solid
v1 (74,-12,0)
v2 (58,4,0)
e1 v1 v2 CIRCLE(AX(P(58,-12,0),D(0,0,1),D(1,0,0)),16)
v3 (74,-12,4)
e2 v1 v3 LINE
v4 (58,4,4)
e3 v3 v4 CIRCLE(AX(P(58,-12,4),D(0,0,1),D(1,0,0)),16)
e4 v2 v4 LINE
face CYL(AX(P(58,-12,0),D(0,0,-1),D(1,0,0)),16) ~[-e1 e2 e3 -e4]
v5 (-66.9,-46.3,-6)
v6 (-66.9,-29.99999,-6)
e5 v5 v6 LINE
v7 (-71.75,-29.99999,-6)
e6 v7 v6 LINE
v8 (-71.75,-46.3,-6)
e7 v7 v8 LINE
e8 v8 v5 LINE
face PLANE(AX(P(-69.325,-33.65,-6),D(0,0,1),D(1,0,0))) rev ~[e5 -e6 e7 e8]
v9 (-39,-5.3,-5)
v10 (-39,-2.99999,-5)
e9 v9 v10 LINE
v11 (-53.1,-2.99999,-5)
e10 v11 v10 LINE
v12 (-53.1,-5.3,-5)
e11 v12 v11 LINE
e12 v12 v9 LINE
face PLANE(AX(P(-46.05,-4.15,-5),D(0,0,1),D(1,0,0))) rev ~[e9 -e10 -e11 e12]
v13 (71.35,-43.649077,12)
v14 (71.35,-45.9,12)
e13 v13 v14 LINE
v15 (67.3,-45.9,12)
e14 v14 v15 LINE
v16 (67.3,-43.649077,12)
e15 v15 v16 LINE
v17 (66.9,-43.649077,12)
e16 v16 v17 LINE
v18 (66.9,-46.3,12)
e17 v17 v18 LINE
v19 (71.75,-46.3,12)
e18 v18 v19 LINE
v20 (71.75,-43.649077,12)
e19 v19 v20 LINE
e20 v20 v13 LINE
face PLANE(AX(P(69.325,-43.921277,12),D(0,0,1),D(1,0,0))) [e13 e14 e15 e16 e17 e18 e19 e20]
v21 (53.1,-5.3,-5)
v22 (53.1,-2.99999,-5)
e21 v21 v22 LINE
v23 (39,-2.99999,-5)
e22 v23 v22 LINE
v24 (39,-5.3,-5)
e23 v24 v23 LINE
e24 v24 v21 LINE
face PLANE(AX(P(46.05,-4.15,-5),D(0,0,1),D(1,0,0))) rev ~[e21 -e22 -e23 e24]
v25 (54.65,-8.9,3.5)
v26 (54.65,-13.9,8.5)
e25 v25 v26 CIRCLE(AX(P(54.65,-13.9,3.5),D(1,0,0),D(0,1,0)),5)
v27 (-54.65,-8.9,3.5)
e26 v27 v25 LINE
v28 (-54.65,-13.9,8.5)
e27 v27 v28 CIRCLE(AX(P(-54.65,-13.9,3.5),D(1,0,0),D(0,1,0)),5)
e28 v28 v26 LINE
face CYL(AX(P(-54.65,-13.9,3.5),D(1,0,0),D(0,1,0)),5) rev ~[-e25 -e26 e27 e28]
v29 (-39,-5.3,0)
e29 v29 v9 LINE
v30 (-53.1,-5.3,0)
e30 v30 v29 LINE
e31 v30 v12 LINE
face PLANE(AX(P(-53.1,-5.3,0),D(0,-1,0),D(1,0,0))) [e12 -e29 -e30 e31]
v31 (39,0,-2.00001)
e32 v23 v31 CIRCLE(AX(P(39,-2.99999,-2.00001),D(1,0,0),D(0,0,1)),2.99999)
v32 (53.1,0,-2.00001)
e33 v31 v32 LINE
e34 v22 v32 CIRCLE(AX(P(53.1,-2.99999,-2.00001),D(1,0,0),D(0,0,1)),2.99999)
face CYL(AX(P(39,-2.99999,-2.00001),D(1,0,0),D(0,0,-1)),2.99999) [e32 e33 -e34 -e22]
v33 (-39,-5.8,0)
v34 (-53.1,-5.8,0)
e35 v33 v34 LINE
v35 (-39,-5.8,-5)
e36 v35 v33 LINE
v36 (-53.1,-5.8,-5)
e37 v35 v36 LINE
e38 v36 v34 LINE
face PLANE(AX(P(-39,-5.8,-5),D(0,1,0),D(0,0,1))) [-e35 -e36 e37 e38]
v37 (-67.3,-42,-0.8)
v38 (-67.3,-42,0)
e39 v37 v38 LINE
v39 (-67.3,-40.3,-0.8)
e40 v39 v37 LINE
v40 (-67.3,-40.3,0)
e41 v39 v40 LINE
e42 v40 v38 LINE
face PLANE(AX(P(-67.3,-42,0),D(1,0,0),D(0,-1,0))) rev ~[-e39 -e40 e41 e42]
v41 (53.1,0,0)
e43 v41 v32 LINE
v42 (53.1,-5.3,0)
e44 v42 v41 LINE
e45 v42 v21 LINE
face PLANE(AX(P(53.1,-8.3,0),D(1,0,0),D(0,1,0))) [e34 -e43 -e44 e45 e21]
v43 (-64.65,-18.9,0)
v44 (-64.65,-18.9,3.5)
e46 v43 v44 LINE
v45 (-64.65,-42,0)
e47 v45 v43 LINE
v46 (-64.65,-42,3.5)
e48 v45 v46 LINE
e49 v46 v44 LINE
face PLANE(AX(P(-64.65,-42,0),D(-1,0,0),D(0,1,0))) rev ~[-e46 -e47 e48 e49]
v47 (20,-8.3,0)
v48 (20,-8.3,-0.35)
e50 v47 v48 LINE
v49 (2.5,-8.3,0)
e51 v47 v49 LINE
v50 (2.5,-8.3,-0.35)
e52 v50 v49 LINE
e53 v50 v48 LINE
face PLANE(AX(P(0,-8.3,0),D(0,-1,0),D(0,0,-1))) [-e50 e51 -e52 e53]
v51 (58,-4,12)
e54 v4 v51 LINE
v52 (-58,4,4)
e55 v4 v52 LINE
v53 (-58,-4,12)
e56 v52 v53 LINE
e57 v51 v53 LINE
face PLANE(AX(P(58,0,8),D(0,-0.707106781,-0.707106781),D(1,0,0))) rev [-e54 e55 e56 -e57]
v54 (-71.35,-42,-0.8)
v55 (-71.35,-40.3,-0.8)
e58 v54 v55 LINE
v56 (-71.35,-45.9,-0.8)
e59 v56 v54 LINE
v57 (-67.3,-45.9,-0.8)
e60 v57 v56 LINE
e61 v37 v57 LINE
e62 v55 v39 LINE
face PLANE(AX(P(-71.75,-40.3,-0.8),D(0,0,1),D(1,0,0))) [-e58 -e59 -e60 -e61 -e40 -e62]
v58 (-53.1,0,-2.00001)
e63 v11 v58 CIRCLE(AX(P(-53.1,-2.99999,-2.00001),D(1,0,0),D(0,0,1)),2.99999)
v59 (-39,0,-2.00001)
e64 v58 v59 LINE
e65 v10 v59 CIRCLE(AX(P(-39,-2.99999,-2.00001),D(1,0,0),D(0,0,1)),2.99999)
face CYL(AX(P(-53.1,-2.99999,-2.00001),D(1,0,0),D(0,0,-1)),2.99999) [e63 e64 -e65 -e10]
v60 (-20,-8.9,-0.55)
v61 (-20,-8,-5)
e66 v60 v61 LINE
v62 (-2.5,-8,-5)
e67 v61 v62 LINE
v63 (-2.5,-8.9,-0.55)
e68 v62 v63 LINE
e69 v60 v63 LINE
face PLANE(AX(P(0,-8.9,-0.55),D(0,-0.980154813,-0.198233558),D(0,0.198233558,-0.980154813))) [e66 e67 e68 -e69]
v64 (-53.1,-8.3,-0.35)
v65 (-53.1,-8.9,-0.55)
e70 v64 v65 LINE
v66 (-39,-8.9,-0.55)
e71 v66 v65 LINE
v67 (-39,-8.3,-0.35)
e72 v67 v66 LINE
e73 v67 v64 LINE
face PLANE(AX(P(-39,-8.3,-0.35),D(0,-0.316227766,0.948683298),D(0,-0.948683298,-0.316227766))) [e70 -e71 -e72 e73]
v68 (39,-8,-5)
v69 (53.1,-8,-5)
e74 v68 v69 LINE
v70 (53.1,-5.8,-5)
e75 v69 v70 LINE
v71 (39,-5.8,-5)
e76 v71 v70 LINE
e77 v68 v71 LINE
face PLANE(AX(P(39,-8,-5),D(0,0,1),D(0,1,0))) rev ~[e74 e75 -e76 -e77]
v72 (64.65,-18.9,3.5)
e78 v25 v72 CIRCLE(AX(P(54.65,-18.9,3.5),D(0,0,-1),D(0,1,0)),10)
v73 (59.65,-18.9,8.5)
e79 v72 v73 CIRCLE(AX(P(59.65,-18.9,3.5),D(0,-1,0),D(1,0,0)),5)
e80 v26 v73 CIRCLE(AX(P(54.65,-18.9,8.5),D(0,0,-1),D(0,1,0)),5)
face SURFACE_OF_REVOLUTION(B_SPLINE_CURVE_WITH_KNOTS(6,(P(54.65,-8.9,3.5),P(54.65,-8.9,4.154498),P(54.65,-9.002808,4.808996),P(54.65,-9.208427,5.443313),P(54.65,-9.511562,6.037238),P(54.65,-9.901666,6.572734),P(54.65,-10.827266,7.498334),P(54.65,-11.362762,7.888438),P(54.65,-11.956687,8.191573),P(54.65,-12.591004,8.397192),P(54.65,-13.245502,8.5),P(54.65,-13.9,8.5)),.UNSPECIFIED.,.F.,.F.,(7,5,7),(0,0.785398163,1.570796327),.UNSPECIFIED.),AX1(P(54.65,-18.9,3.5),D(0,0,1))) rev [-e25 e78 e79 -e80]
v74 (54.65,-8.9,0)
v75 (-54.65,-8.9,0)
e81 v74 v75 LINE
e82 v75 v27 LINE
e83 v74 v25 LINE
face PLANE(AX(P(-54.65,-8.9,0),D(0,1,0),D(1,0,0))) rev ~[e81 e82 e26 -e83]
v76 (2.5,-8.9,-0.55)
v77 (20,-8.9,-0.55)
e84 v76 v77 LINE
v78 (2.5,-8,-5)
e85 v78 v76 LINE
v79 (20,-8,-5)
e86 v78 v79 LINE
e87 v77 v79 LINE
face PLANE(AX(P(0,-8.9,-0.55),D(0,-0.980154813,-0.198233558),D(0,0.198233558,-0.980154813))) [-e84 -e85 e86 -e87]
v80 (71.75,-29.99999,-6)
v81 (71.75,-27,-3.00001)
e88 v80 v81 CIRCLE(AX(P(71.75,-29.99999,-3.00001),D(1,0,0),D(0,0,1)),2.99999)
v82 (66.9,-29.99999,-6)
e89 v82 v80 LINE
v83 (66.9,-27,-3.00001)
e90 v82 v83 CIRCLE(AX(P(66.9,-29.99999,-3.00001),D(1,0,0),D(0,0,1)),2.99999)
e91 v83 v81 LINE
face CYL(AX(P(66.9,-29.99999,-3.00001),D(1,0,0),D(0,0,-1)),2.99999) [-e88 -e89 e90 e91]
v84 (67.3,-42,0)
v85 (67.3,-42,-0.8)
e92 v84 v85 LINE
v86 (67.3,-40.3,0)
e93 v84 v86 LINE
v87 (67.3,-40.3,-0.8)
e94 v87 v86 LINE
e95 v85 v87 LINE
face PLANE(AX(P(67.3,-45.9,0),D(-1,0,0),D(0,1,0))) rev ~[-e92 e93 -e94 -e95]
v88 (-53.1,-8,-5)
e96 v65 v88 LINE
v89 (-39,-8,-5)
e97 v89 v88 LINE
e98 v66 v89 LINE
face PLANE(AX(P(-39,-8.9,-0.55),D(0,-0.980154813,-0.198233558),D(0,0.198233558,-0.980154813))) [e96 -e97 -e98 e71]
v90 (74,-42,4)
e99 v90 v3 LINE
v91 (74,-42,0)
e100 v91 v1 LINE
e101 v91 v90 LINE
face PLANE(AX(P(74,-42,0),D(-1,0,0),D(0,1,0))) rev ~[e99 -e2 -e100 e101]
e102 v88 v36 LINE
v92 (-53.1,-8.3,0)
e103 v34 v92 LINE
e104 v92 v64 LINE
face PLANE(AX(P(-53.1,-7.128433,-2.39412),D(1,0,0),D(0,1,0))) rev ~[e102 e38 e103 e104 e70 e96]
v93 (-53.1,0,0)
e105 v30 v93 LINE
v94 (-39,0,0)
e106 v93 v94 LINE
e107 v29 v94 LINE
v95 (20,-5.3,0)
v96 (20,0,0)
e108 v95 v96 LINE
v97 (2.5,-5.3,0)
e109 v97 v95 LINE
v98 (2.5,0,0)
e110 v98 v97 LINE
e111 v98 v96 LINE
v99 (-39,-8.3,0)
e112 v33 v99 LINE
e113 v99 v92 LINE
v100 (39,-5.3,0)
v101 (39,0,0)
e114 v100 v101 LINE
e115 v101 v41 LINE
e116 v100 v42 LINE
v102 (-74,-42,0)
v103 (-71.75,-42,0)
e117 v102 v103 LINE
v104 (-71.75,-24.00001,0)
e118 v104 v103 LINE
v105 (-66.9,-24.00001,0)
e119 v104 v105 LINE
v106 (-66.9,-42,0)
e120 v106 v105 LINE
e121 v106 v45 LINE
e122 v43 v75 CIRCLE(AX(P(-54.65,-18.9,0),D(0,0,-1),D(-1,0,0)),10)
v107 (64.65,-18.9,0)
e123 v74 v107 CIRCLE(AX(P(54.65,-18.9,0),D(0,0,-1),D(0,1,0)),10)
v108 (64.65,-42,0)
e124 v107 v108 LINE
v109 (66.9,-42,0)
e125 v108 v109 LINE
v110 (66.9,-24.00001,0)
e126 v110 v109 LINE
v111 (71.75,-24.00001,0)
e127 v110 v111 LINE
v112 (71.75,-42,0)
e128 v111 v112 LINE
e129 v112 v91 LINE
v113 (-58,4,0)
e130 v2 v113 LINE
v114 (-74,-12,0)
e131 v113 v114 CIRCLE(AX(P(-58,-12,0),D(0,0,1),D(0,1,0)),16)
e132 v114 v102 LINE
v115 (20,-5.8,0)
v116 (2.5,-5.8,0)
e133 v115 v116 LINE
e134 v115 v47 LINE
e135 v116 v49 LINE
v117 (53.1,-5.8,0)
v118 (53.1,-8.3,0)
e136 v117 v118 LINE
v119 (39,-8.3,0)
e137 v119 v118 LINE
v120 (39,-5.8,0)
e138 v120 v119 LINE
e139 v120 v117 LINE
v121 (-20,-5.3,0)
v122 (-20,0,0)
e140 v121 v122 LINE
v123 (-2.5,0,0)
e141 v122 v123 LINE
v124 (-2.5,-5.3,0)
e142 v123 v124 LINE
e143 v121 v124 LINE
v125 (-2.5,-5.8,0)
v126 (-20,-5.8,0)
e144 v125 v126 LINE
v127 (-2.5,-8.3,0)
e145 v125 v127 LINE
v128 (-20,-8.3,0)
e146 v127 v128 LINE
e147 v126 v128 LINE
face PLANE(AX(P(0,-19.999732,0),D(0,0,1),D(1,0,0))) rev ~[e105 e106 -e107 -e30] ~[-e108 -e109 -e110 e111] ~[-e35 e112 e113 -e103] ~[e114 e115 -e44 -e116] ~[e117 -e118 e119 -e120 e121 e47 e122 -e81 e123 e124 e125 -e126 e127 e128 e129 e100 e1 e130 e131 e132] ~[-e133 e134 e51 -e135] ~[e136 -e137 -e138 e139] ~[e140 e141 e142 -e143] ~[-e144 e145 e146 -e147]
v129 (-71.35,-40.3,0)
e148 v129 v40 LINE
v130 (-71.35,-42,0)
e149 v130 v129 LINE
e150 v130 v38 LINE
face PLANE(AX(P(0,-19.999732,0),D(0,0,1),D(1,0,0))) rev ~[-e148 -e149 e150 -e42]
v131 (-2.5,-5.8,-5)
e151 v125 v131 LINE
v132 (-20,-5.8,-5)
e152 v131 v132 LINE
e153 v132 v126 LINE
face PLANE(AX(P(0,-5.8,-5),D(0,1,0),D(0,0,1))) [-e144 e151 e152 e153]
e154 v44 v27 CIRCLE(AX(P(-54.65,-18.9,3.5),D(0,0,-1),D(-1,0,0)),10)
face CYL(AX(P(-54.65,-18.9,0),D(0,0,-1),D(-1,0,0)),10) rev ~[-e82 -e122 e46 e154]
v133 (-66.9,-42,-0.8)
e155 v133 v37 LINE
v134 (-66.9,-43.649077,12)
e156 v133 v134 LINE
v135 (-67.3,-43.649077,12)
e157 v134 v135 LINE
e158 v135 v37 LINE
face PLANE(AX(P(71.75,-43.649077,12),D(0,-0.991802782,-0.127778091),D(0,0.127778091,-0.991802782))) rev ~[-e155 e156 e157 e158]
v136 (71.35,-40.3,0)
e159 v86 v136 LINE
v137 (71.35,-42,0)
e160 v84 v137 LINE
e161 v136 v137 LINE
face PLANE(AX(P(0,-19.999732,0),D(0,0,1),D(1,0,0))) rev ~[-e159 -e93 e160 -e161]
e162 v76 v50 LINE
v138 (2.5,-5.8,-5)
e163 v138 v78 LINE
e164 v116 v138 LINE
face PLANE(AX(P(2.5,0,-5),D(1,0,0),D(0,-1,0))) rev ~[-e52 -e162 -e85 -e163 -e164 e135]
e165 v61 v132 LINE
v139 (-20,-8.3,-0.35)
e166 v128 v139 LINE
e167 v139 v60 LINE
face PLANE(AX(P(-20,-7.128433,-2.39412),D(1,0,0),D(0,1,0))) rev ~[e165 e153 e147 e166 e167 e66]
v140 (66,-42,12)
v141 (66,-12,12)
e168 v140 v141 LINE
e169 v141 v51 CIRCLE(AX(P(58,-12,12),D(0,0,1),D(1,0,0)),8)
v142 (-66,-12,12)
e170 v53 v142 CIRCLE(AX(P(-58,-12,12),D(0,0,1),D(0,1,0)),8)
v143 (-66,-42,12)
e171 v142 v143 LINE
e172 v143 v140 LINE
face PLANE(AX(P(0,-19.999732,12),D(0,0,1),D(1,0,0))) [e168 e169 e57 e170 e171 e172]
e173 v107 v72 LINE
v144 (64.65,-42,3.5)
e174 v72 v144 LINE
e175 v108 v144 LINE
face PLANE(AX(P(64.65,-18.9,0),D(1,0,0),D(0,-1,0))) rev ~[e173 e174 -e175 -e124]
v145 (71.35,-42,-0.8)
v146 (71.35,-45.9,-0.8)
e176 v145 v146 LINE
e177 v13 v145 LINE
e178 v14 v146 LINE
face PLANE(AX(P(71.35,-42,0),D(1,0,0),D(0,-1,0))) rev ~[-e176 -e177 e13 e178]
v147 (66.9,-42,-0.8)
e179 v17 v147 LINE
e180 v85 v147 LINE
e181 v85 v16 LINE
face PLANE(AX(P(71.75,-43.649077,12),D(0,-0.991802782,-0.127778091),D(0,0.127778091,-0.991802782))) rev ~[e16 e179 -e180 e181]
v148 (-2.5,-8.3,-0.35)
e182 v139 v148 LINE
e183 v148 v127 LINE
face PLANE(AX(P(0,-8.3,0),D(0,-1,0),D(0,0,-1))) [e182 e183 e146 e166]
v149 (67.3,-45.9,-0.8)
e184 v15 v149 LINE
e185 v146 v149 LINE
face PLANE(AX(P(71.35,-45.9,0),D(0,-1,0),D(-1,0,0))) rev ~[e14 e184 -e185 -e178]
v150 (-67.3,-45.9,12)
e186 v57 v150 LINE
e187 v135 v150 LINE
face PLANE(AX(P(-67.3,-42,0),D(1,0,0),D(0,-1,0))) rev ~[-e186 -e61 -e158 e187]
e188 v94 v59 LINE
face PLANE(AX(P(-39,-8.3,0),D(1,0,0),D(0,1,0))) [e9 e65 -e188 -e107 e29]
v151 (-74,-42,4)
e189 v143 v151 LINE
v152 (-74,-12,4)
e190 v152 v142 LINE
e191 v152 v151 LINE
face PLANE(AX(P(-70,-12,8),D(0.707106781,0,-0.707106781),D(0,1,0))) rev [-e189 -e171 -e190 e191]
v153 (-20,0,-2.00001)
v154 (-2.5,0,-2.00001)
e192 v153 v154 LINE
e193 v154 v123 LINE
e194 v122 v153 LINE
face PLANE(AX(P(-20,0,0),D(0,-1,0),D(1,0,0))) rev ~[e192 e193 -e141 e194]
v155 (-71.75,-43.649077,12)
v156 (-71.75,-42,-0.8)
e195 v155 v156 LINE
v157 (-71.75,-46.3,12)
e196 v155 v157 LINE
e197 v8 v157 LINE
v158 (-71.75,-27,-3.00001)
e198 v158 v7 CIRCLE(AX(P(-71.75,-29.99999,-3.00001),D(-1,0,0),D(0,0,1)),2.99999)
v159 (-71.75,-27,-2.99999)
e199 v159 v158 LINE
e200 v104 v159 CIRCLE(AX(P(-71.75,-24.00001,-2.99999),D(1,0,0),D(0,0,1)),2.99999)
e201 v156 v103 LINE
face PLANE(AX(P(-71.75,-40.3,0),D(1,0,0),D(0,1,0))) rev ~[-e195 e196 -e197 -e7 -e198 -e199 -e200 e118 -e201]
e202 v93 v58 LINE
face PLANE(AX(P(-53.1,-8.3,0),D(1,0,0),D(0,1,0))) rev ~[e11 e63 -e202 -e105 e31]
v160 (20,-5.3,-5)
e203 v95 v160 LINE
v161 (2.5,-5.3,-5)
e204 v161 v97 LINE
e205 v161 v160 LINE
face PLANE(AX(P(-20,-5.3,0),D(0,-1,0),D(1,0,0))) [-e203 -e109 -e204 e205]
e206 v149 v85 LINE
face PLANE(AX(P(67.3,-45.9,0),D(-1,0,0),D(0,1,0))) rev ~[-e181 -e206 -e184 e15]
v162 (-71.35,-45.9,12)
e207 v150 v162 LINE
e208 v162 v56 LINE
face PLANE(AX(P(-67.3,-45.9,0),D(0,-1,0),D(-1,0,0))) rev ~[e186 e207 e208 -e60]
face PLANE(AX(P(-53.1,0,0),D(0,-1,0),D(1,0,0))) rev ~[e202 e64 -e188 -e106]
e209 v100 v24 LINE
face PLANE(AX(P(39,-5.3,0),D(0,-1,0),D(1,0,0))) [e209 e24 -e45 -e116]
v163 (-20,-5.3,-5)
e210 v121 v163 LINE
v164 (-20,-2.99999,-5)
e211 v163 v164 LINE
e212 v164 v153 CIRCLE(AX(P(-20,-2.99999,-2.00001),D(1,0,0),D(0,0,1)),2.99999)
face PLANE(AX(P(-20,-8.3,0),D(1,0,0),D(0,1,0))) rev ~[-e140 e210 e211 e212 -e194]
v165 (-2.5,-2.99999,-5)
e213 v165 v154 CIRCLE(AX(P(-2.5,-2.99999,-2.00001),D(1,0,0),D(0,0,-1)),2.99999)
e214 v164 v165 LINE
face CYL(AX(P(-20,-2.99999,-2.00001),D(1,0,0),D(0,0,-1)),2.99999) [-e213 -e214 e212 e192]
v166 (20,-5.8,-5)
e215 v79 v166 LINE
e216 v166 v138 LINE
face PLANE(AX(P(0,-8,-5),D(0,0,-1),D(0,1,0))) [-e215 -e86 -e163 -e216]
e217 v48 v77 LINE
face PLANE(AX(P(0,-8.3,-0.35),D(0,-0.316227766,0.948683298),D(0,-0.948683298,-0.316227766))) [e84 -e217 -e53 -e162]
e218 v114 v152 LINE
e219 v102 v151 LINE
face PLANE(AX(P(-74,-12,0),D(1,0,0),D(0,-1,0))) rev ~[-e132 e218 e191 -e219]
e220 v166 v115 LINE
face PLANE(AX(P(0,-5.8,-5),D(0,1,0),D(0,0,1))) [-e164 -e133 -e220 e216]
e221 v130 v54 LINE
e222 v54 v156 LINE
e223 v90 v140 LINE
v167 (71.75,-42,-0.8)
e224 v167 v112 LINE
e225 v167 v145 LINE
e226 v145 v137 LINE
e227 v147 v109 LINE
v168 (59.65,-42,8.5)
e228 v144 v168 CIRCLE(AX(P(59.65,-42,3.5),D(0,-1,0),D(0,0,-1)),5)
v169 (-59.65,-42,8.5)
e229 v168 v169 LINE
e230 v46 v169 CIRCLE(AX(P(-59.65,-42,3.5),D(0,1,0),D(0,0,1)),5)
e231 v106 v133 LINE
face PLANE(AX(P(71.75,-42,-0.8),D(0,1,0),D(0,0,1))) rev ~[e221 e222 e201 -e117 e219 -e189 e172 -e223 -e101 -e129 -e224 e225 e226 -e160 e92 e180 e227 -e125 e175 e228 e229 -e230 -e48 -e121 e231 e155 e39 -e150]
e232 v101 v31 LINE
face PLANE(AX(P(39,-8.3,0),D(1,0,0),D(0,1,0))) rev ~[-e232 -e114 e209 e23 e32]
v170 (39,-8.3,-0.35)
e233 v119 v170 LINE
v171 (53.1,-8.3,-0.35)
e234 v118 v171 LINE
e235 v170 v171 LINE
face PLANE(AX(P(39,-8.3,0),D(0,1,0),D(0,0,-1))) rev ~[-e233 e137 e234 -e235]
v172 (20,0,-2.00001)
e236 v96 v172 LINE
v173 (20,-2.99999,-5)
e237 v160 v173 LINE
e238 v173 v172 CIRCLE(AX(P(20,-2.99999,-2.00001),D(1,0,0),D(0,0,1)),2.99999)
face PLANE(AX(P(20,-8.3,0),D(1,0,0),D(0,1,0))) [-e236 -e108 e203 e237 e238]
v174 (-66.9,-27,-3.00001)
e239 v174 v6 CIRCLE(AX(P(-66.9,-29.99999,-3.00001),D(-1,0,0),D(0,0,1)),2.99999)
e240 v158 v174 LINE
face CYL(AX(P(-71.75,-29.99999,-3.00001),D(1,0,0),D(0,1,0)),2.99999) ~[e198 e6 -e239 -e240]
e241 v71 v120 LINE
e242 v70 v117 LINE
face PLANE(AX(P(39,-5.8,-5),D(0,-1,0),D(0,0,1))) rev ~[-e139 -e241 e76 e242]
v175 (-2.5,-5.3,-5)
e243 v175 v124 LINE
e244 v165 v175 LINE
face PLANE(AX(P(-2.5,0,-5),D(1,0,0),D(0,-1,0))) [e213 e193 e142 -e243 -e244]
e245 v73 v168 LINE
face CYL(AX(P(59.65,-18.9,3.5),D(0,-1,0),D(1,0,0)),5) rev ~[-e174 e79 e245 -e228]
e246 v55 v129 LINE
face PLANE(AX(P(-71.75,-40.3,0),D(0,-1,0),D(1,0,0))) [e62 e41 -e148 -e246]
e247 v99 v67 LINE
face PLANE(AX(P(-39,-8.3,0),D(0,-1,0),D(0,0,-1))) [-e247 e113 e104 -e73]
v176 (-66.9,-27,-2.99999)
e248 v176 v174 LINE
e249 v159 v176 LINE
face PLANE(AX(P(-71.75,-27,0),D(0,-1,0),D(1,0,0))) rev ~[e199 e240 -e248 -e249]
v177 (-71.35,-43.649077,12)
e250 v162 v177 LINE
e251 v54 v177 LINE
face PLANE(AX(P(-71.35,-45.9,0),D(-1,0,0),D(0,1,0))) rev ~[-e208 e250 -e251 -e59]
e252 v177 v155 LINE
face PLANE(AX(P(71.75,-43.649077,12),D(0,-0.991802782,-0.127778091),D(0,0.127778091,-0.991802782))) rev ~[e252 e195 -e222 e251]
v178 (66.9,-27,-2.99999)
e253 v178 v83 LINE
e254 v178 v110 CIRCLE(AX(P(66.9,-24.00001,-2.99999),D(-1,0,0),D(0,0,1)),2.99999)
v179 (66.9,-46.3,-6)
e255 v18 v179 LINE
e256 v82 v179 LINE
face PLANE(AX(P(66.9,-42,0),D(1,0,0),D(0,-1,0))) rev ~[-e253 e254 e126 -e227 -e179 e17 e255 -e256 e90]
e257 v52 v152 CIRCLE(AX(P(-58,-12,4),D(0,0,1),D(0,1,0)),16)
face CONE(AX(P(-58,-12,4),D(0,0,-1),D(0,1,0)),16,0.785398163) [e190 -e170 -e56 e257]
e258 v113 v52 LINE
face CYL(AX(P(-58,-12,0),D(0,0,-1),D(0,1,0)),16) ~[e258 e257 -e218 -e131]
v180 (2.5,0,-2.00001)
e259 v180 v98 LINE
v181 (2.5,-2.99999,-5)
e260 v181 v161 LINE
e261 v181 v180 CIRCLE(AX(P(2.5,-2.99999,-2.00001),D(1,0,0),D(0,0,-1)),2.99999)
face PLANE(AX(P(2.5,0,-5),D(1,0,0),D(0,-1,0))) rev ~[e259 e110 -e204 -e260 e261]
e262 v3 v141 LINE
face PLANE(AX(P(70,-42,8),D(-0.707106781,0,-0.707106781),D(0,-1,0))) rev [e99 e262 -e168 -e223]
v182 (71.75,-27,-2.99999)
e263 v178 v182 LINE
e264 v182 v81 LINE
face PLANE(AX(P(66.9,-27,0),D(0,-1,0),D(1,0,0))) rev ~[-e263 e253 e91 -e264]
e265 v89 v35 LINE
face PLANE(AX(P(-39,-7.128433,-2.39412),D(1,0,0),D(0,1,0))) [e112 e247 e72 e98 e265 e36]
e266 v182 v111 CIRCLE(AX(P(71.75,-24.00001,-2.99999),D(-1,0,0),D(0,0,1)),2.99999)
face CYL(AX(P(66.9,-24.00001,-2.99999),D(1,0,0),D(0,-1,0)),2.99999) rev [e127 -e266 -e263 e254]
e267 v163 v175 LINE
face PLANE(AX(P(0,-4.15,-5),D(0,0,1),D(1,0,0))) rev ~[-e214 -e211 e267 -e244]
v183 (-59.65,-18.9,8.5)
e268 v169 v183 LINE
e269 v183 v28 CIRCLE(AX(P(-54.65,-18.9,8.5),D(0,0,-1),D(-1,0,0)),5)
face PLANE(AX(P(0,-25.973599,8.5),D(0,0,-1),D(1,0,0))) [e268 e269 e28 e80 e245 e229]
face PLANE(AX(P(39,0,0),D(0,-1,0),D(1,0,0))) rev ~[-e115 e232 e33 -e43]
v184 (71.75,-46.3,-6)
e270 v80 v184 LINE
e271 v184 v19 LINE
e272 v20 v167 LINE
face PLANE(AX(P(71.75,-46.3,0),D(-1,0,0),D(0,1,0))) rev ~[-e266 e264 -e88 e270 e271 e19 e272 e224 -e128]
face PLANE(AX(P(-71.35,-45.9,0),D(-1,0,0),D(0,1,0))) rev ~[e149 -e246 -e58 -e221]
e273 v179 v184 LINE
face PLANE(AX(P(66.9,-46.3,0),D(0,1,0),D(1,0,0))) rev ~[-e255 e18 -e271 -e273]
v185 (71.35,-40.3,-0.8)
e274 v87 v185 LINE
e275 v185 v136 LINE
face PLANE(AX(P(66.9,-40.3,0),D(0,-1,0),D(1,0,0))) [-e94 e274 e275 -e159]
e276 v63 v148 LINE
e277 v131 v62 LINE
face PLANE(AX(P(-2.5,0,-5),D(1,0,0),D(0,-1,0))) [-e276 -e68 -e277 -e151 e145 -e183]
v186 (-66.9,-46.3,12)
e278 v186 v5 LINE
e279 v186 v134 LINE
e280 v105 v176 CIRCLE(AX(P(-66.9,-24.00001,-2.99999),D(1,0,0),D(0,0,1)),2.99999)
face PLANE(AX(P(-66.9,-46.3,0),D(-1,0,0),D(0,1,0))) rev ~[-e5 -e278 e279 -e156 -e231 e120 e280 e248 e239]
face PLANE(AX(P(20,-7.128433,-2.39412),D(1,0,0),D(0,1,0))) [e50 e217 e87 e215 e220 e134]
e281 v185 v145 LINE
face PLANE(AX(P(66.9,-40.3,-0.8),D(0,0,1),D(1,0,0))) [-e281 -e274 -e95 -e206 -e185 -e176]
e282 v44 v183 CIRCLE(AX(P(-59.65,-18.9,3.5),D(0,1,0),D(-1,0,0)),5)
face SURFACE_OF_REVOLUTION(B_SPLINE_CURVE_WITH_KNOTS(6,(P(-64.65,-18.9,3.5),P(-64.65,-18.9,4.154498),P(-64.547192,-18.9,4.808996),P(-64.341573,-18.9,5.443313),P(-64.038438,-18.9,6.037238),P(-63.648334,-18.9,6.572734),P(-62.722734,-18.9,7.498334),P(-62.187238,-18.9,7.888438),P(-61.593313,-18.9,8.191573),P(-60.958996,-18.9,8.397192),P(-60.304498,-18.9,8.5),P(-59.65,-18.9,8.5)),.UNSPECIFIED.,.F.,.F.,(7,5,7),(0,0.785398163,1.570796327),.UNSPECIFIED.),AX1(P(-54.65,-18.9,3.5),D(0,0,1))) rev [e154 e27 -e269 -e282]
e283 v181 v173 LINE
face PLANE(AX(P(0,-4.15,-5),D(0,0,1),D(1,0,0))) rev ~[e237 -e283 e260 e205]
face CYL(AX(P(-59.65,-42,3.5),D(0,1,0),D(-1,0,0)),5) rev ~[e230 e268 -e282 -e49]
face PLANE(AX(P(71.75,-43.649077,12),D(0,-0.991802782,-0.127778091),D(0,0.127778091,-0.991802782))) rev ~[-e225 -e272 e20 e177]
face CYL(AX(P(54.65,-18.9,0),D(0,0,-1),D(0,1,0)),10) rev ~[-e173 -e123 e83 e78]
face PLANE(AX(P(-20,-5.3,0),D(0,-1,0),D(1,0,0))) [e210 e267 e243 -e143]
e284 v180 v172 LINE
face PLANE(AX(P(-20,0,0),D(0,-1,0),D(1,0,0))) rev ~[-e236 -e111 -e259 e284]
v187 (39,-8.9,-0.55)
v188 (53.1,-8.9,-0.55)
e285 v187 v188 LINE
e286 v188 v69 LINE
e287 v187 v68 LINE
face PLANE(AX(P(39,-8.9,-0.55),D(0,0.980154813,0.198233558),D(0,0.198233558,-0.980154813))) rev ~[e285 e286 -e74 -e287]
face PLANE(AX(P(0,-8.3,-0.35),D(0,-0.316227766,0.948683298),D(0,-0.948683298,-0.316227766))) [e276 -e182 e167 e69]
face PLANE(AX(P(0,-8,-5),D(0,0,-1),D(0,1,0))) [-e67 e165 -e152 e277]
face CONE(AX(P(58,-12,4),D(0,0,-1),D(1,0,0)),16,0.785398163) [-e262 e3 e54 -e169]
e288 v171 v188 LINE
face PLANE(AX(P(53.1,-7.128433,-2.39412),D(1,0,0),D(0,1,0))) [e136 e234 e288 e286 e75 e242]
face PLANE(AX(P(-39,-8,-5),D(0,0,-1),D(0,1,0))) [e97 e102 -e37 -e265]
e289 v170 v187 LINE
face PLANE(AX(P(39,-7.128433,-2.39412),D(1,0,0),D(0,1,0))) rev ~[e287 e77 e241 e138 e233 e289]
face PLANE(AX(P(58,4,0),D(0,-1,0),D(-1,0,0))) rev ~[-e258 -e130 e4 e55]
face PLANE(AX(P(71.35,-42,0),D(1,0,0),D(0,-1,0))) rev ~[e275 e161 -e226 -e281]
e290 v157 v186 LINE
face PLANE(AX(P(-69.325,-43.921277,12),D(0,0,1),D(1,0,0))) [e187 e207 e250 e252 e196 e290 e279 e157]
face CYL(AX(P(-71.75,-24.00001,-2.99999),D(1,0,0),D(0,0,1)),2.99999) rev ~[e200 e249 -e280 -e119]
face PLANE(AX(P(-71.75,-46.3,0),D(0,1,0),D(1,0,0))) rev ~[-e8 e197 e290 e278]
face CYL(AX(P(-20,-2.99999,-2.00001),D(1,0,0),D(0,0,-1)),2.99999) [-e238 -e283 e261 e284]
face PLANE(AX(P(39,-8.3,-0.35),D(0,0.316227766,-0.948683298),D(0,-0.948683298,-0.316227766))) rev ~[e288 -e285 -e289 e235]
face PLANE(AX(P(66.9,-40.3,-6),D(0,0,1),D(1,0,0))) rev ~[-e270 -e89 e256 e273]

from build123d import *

# Parameters (mm, degrees)
F2_DEPTH      = 12
F3_SIZE       = 8
F0_W          = 14.1
F0_H          = 8.3
F0_W_2        = 40
F4_DEPTH      = 5
F6_DEPTH      = 3
F7_DEPTH      = 20
F7_DEPTH_BACK = 20
F8_START      = 39
F8_DEPTH      = 14.1
F9_START      = -39
F9_DEPTH      = 14.1
F0_W_3        = 4.85
F0_H_2        = 13.3
F10_DEPTH     = 6
F12_DEPTH     = 8.5
F13_W         = 4.85
F13_H         = 5.2
F14_DEPTH     = 6
F15_R         = 2.99999
F16_R         = 5
F17_W         = 5
F17_H         = 8.9
F18_DEPTH     = 5
F20_DEPTH     = 0.8
F21_DEPTH     = 12
F23_DEPTH     = 145.751


# Not quite as in the source:
# - a fillet or chamfer is up to 0.001 mm smaller than in the source, because OpenCascade refuses the exact size


with BuildPart() as f2:
    # F1 (on Top) → F2 (new body)
    with BuildSketch(Plane.XY):
        with BuildLine():
            Line((58, 4), (-58, 4))
            ThreePointArc((-58, 4), (-69.313708499, -0.686291501), (-74, -12))
            Line((-74, -12), (-74, -42))
            Line((-74, -42), (74, -42))
            Line((74, -42), (74, -12))
            ThreePointArc((74, -12), (69.313708499, -0.686291501), (58, 4))
        make_face()
    extrude(amount=F2_DEPTH)

    # F3
    f3_edges = [f2.edges().sort_by_distance(p)[0] for p in [
        (74, -27, 12),
        (0, 4, 12),
        (-74, -27, 12),
    ]]
    chamfer(f3_edges, length=F3_SIZE)

    # F0 (on Top) → F4 (join)
    with BuildSketch(Plane.XY):
        with Locations((-46.05, -4.15)):
            Rectangle(F0_W, F0_H)
        with Locations((0, -4.15)):
            Rectangle(F0_W_2, F0_H)
        with Locations((46.05, -4.15)):
            Rectangle(F0_W, F0_H)
    extrude(amount=-F4_DEPTH)

    # F6 (cut): faces of the model
    f6_faces = [f2.faces().sort_by_distance(p)[0] for p in [
        (0, -8.3, -2.5),
        (46.05, -8.3, -2.5),
        (-46.05, -8.3, -2.5),
    ]]
    extrude(f6_faces, amount=-F6_DEPTH, mode=Mode.SUBTRACT)

    # F5 (on Right) → F7 (join, two sides)
    with BuildSketch(Plane.YZ) as f7_sk:
        Polygon((-5.8, 0), (-8.3, 0), (-8.3, -0.35), (-8.9, -0.55), (-8, -5), (-5.8, -5), align=None)
    extrude(amount=F7_DEPTH)
    extrude(f7_sk.sketch, amount=-F7_DEPTH_BACK)

    # F5 (on Right) → F8 (join)
    with BuildSketch(Plane.YZ.offset(F8_START)):
        Polygon((-5.8, 0), (-8.3, 0), (-8.3, -0.35), (-8.9, -0.55), (-8, -5), (-5.8, -5), align=None)
    extrude(amount=F8_DEPTH)

    # F5 (on Right) → F9 (join)
    with BuildSketch(Plane.YZ.offset(F9_START)):
        Polygon((-5.8, 0), (-8.3, 0), (-8.3, -0.35), (-8.9, -0.55), (-8, -5), (-5.8, -5), align=None)
    extrude(amount=-F9_DEPTH)

    # F0 (on Top) → F10 (join)
    with BuildSketch(Plane.XY):
        with Locations((69.325, -33.65)):
            Rectangle(F0_W_3, F0_H_2)
        with Locations((-69.325, -33.65)):
            Rectangle(F0_W_3, F0_H_2)
    extrude(amount=-F10_DEPTH)

    # F11 (on face) → F12 (cut)
    with BuildSketch(Plane(origin=(0, 0, 0), x_dir=(1, 0, 0), z_dir=(0, 0, -1))):
        with BuildLine():
            Line((64.65, 18.9), (64.65, 42))
            Line((64.65, 42), (-64.65, 42))
            Line((-64.65, 42), (-64.65, 18.9))
            ThreePointArc((-64.65, 18.9), (-61.7210678119, 11.8289321881), (-54.65, 8.9))
            Line((-54.65, 8.9), (54.65, 8.9))
            ThreePointArc((54.65, 8.9), (61.7210678119, 11.8289321881), (64.65, 18.9))
        make_face()
    extrude(amount=-F12_DEPTH, mode=Mode.SUBTRACT)

    # F13 (on face) → F14 (join)
    with BuildSketch(Plane.XZ.offset(40.3)):
        with Locations((69.325, -3.4)):
            Rectangle(F13_W, F13_H)
        with Locations((-69.325, -3.4)):
            Rectangle(F13_W, F13_H)
    extrude(amount=F14_DEPTH)

    # F15 (radius 3 in the source; OpenCascade refuses exactly that, so slightly less here)
    f15_edges = [f2.edges().sort_by_distance(p)[0] for p in [
        (0, 0, -5),
        (-46.05, 0, -5),
        (46.05, 0, -5),
        (-69.325, -27, -6),
        (69.325, -27, -6),
        (69.325, -27, 0),
        (-69.325, -27, 0),
    ]]
    fillet(f15_edges, radius=F15_R)

    # F16
    f16_edges = [f2.edges().sort_by_distance(p)[0] for p in [
        (64.65, -30.45, 8.5),
    ]]
    fillet(f16_edges, radius=F16_R)

    # F17 (on face) → F18 (cut, through all)
    with BuildSketch(Plane(origin=(0, 0, -5), x_dir=(1, 0, 0), z_dir=(0, 0, -1))):
        with Locations((0, 4.45)):
            Rectangle(F17_W, F17_H)
    extrude(amount=-F18_DEPTH, mode=Mode.SUBTRACT)

    # F19 (on face) → F20 (join, through all)
    with BuildSketch(Plane.XY.offset(-0.8)):
        Polygon((71.75, -46.3), (71.75, -40.3), (71.35, -40.3), (71.35, -45.9), (67.3, -45.9), (67.3, -40.3), (66.9, -40.3), (66.9, -46.3), align=None)
        Polygon((-71.35, -40.3), (-71.75, -40.3), (-71.75, -46.3), (-66.9, -46.3), (-66.9, -40.3), (-67.3, -40.3), (-67.3, -45.9), (-71.35, -45.9), align=None)
    extrude(amount=F20_DEPTH)

    # F21 (add, through all): faces of the model
    f21_faces = [f2.faces().sort_by_distance(p)[0] for p in [
        (69.325, -46.2351829498, 0),
        (-71.55, -42.0648170502, 0),
    ]]
    extrude(f21_faces, amount=F21_DEPTH)

    # F22 (on face) → F23 (cut, through all)
    with BuildSketch(Plane.YZ.offset(71.75)):
        Polygon((-42, -0.8), (-42, 12.0000000009), (-43.6490774155, 12), align=None)
    extrude(amount=-F23_DEPTH, mode=Mode.SUBTRACT)


solid = f2.part
